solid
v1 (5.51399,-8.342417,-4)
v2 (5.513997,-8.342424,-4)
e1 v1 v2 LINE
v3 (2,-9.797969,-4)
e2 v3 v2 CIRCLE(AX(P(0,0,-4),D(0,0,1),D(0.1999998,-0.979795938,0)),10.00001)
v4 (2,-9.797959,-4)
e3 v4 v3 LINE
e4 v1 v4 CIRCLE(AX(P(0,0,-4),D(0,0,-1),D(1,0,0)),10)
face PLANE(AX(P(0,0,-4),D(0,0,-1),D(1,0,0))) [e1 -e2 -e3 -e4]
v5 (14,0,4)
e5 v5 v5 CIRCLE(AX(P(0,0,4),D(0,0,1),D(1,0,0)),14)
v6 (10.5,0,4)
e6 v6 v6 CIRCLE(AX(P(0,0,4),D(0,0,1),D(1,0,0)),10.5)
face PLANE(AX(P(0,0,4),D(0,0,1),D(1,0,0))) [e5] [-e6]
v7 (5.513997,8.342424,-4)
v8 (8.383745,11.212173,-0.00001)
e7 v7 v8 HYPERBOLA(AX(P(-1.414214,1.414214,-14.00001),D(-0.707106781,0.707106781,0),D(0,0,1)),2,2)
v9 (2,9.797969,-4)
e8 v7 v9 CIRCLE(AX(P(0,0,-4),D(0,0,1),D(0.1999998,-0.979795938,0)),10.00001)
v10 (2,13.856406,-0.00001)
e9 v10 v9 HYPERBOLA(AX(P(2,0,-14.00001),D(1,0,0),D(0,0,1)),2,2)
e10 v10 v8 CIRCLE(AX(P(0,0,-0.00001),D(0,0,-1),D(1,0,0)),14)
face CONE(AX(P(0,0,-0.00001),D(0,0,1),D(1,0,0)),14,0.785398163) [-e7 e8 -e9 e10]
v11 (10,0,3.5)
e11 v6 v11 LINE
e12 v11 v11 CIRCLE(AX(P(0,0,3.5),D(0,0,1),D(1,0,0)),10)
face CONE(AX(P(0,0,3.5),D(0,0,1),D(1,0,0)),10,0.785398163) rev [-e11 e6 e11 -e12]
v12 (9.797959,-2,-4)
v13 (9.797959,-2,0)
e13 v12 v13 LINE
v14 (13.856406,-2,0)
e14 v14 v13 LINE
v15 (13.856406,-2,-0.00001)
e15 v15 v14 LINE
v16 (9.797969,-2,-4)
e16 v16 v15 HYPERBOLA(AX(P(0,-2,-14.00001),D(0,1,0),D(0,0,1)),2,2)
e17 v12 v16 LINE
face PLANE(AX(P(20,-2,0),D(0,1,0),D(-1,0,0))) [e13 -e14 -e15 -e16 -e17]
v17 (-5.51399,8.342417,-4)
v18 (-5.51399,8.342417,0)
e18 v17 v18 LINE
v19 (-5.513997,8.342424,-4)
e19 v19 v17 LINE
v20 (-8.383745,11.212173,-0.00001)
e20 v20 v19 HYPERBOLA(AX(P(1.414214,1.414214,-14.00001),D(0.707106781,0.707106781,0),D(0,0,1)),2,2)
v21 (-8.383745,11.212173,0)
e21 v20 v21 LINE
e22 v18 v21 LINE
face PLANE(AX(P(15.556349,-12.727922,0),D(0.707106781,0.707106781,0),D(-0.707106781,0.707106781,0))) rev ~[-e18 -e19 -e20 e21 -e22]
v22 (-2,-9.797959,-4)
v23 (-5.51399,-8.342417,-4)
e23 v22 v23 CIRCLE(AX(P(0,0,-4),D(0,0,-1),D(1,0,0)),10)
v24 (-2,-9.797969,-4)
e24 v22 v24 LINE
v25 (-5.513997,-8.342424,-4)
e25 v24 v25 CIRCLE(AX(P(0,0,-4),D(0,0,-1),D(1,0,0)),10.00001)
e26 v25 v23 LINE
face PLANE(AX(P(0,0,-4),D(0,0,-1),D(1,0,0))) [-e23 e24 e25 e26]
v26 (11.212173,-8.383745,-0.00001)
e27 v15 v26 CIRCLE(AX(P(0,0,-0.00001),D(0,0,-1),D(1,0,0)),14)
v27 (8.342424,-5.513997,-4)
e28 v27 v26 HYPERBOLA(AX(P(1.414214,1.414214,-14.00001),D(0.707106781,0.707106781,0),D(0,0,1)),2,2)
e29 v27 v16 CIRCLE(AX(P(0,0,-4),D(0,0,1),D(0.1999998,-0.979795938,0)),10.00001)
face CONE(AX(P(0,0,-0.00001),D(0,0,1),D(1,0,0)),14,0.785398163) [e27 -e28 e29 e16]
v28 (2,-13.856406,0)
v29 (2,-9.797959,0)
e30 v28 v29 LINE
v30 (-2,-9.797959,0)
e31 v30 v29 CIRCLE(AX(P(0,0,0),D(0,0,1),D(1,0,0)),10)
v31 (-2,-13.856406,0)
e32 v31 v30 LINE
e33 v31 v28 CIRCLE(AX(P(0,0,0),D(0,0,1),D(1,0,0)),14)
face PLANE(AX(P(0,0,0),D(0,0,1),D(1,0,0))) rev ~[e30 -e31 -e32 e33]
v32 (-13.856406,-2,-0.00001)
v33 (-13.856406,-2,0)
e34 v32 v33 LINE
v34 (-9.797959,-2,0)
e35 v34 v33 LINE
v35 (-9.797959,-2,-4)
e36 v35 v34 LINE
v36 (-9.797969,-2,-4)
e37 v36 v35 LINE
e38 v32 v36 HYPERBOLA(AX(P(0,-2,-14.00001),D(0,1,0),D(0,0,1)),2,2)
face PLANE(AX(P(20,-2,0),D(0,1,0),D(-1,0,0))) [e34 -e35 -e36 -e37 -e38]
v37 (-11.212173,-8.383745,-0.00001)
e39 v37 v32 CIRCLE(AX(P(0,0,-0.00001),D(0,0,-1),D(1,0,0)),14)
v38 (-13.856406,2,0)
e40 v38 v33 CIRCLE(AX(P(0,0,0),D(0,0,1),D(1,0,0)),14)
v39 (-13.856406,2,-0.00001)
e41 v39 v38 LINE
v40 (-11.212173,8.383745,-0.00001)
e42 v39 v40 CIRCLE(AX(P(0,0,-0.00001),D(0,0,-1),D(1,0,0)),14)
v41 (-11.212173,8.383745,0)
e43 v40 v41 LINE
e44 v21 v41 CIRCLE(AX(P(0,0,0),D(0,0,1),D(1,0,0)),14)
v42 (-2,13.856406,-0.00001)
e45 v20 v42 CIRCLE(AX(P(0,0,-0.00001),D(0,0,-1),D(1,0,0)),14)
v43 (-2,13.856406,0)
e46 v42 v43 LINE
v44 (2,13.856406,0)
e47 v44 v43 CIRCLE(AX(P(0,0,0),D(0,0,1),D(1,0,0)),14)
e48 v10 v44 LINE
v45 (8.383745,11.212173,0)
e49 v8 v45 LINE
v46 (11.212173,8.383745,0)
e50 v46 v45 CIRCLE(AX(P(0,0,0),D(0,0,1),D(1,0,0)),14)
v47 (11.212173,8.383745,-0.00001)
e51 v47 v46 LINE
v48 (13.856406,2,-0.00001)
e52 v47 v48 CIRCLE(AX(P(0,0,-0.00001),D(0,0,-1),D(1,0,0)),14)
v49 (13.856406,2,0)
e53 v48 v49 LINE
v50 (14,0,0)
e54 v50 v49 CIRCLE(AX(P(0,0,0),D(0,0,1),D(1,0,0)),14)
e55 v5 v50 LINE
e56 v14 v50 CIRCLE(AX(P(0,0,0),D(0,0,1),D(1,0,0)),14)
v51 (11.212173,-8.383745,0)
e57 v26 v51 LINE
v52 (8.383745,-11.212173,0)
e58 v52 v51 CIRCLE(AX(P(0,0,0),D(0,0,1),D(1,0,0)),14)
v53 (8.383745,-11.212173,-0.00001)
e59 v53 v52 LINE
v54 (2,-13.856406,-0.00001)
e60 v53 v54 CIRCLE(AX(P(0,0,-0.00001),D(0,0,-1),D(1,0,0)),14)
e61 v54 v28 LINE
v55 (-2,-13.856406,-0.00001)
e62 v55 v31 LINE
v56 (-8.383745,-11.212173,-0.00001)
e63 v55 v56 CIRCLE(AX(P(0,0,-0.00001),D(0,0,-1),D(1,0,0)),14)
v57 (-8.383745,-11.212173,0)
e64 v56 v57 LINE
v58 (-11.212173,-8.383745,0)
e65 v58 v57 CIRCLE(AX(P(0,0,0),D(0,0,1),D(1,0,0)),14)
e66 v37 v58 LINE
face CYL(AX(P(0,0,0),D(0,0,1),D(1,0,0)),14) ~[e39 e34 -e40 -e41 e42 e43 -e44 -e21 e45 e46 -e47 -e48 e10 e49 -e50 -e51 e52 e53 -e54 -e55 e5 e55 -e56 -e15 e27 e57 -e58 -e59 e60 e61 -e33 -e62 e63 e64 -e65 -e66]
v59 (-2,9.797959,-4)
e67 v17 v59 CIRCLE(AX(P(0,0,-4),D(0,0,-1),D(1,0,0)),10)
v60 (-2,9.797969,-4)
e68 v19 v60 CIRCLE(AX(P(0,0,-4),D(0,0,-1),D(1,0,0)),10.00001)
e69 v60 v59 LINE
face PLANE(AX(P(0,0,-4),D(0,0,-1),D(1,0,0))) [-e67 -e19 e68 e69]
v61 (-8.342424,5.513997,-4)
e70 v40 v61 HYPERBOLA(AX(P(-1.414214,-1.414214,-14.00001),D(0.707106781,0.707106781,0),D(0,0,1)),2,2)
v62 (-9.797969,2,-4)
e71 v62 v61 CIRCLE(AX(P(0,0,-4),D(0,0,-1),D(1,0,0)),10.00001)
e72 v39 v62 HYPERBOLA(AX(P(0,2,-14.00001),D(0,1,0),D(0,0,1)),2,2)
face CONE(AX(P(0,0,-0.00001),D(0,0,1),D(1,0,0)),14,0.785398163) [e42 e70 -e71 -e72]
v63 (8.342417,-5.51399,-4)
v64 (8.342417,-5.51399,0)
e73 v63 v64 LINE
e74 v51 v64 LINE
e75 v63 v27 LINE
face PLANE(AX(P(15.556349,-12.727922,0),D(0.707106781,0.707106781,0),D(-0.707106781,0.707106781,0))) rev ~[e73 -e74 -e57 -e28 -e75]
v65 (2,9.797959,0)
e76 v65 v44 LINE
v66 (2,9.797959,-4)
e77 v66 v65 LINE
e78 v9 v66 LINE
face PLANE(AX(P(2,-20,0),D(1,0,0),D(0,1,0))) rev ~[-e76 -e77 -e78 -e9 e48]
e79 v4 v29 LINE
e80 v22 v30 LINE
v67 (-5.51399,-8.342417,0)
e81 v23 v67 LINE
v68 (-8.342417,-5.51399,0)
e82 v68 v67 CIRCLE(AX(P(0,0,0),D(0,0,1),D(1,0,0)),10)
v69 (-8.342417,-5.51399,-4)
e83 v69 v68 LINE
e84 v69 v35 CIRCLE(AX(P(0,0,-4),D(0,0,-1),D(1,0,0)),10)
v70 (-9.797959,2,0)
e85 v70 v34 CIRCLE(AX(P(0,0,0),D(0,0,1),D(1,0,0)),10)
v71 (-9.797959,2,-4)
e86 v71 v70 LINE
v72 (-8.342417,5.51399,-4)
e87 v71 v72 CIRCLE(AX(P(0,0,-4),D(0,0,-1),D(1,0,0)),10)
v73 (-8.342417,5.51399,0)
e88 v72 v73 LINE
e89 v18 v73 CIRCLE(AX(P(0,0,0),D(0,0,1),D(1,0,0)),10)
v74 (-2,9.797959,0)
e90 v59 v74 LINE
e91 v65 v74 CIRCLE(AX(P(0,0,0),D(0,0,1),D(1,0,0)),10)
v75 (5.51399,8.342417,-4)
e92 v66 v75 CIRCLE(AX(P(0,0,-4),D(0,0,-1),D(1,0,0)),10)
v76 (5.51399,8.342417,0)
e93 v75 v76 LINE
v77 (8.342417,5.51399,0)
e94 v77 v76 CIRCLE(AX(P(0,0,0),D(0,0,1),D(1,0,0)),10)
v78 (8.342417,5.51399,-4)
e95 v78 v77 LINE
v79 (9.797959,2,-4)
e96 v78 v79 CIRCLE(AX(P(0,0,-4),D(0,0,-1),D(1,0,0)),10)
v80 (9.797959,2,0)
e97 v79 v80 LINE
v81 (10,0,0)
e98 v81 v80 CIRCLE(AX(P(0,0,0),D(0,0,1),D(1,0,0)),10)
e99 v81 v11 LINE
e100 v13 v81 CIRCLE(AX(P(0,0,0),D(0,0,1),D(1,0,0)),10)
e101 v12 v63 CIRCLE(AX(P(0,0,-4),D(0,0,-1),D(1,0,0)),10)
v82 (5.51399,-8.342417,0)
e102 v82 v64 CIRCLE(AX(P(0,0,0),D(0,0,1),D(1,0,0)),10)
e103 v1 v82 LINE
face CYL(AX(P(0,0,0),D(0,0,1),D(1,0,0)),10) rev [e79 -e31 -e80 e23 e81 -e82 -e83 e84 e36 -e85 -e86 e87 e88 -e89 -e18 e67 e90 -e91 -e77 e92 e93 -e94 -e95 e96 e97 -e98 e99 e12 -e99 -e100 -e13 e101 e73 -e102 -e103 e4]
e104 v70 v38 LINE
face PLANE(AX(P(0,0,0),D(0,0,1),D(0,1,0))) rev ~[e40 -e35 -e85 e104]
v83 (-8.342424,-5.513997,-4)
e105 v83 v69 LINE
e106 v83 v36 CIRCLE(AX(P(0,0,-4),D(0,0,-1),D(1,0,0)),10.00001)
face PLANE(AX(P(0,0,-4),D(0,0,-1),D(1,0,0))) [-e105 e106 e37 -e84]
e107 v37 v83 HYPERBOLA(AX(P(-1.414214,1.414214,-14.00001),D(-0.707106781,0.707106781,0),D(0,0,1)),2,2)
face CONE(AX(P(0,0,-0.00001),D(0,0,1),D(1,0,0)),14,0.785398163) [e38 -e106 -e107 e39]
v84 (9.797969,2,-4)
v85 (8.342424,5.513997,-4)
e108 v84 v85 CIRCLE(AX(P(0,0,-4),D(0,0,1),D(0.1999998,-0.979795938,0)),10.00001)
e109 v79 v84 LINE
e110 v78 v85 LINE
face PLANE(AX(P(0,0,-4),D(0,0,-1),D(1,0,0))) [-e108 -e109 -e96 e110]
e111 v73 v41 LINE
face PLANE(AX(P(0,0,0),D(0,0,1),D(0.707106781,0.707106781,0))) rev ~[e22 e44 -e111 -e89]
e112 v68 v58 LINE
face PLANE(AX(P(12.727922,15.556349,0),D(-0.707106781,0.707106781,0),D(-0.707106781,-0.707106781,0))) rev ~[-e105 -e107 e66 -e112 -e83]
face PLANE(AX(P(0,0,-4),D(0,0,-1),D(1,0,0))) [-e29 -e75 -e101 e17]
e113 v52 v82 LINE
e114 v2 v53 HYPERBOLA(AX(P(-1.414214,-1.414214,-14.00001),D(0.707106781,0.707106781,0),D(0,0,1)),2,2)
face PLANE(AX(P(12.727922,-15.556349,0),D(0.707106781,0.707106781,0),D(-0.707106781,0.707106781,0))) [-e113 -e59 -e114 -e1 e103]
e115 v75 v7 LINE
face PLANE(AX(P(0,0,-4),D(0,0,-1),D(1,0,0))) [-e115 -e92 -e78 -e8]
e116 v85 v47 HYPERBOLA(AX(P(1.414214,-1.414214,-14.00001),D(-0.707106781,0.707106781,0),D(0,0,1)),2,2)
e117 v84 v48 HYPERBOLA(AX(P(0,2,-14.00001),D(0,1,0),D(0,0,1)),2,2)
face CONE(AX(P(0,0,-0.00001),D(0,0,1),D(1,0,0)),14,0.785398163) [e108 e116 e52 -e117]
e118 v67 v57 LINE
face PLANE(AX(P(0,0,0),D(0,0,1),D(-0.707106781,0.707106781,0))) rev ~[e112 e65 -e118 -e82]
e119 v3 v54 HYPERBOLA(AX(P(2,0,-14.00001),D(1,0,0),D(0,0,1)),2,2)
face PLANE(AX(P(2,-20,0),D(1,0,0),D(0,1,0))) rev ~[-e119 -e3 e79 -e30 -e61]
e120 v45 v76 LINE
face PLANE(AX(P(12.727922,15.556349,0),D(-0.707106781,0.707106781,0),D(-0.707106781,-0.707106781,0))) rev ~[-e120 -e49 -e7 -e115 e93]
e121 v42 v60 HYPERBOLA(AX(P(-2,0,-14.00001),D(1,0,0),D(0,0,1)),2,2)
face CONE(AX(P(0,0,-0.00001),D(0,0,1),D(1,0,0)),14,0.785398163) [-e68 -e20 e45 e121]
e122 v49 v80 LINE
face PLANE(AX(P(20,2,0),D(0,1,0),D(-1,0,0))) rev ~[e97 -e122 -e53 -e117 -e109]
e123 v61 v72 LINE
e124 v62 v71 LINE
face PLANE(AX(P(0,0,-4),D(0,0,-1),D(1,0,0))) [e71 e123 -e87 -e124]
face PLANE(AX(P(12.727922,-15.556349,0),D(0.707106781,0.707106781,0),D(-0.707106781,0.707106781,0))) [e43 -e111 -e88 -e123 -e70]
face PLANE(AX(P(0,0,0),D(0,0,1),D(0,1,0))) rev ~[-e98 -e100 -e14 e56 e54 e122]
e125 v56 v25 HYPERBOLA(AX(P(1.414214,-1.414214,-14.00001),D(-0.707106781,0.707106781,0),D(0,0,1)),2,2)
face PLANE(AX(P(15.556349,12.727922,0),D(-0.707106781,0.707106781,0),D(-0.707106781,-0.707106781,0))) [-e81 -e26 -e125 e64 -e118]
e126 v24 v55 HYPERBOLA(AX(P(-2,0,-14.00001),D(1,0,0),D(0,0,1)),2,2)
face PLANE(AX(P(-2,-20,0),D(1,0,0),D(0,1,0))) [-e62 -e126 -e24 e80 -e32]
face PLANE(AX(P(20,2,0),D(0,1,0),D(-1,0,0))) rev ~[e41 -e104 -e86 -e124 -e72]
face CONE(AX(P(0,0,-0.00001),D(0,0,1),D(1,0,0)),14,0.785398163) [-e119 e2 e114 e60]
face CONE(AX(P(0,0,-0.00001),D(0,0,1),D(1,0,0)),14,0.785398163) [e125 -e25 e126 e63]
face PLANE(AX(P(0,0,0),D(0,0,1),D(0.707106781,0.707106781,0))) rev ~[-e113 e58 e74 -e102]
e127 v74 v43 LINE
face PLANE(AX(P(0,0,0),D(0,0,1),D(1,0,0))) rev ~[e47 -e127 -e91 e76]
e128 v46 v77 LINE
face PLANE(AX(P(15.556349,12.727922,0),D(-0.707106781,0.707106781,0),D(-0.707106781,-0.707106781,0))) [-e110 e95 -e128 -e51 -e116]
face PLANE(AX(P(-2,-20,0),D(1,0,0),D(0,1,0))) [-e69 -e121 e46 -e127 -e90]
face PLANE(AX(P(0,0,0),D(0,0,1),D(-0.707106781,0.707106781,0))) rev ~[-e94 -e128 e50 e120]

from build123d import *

# Parameters (mm, degrees)
F0_R            = 14
F0_R_2          = 10
F1_DEPTH        = 4
F2_R            = 14
F2_R_2          = 10
F3_DEPTH        = 4
F4_SIZE         = 0.5
F5_SIZE         = 3.99999
F6_W            = 4
F6_H            = 40
F7_DEPTH        = 4.001
F7_COPIES_COUNT = 4
F7_COPIES_ANGLE = 135


# Not quite as in the source:
# - a fillet or chamfer is up to 0.001 mm smaller than in the source, because OpenCascade refuses the exact size
# - a pattern or mirror of a feature is missing from the dataset's text; its kind, count and spacing are read off the source's solid


with BuildPart() as f1:
    # F0 (on Top) → F1 (new body)
    with BuildSketch(Plane.XY):
        Circle(F0_R)
        Circle(F0_R_2, mode=Mode.SUBTRACT)
    extrude(amount=F1_DEPTH)

    # F2 (on face) → F3 (join)
    with BuildSketch(Plane(origin=(0, 0, 0), x_dir=(1, 0, 0), z_dir=(0, 0, -1))):
        Circle(F2_R)
        Circle(F2_R_2, mode=Mode.SUBTRACT)
    extrude(amount=F3_DEPTH)

    # F4
    f4_edges = [f1.edges().sort_by_distance(p)[0] for p in [
        (-10, 0, 4),
    ]]
    chamfer(f4_edges, length=F4_SIZE)

    # F5 (size 4 in the source; OpenCascade refuses exactly that, so slightly less here)
    f5_edges = [f1.edges().sort_by_distance(p)[0] for p in [
        (-14, 0, -4),
    ]]
    chamfer(f5_edges, length=F5_SIZE)

    # F6 (on Top) → F7 (cut, through all)
    with BuildSketch(Plane.XY):
        Rectangle(F6_W, F6_H)
    f7 = extrude(amount=-F7_DEPTH, mode=Mode.SUBTRACT)

    # F7_copies: F7 ×4 about axis
    f7_copies_axis = Axis((0, 0, 0), (0, 0, 1))
    for i in range(1, F7_COPIES_COUNT):
        add(f7.rotate(f7_copies_axis, i * F7_COPIES_ANGLE / (F7_COPIES_COUNT - 1)), mode=Mode.SUBTRACT)


solid = f1.part
